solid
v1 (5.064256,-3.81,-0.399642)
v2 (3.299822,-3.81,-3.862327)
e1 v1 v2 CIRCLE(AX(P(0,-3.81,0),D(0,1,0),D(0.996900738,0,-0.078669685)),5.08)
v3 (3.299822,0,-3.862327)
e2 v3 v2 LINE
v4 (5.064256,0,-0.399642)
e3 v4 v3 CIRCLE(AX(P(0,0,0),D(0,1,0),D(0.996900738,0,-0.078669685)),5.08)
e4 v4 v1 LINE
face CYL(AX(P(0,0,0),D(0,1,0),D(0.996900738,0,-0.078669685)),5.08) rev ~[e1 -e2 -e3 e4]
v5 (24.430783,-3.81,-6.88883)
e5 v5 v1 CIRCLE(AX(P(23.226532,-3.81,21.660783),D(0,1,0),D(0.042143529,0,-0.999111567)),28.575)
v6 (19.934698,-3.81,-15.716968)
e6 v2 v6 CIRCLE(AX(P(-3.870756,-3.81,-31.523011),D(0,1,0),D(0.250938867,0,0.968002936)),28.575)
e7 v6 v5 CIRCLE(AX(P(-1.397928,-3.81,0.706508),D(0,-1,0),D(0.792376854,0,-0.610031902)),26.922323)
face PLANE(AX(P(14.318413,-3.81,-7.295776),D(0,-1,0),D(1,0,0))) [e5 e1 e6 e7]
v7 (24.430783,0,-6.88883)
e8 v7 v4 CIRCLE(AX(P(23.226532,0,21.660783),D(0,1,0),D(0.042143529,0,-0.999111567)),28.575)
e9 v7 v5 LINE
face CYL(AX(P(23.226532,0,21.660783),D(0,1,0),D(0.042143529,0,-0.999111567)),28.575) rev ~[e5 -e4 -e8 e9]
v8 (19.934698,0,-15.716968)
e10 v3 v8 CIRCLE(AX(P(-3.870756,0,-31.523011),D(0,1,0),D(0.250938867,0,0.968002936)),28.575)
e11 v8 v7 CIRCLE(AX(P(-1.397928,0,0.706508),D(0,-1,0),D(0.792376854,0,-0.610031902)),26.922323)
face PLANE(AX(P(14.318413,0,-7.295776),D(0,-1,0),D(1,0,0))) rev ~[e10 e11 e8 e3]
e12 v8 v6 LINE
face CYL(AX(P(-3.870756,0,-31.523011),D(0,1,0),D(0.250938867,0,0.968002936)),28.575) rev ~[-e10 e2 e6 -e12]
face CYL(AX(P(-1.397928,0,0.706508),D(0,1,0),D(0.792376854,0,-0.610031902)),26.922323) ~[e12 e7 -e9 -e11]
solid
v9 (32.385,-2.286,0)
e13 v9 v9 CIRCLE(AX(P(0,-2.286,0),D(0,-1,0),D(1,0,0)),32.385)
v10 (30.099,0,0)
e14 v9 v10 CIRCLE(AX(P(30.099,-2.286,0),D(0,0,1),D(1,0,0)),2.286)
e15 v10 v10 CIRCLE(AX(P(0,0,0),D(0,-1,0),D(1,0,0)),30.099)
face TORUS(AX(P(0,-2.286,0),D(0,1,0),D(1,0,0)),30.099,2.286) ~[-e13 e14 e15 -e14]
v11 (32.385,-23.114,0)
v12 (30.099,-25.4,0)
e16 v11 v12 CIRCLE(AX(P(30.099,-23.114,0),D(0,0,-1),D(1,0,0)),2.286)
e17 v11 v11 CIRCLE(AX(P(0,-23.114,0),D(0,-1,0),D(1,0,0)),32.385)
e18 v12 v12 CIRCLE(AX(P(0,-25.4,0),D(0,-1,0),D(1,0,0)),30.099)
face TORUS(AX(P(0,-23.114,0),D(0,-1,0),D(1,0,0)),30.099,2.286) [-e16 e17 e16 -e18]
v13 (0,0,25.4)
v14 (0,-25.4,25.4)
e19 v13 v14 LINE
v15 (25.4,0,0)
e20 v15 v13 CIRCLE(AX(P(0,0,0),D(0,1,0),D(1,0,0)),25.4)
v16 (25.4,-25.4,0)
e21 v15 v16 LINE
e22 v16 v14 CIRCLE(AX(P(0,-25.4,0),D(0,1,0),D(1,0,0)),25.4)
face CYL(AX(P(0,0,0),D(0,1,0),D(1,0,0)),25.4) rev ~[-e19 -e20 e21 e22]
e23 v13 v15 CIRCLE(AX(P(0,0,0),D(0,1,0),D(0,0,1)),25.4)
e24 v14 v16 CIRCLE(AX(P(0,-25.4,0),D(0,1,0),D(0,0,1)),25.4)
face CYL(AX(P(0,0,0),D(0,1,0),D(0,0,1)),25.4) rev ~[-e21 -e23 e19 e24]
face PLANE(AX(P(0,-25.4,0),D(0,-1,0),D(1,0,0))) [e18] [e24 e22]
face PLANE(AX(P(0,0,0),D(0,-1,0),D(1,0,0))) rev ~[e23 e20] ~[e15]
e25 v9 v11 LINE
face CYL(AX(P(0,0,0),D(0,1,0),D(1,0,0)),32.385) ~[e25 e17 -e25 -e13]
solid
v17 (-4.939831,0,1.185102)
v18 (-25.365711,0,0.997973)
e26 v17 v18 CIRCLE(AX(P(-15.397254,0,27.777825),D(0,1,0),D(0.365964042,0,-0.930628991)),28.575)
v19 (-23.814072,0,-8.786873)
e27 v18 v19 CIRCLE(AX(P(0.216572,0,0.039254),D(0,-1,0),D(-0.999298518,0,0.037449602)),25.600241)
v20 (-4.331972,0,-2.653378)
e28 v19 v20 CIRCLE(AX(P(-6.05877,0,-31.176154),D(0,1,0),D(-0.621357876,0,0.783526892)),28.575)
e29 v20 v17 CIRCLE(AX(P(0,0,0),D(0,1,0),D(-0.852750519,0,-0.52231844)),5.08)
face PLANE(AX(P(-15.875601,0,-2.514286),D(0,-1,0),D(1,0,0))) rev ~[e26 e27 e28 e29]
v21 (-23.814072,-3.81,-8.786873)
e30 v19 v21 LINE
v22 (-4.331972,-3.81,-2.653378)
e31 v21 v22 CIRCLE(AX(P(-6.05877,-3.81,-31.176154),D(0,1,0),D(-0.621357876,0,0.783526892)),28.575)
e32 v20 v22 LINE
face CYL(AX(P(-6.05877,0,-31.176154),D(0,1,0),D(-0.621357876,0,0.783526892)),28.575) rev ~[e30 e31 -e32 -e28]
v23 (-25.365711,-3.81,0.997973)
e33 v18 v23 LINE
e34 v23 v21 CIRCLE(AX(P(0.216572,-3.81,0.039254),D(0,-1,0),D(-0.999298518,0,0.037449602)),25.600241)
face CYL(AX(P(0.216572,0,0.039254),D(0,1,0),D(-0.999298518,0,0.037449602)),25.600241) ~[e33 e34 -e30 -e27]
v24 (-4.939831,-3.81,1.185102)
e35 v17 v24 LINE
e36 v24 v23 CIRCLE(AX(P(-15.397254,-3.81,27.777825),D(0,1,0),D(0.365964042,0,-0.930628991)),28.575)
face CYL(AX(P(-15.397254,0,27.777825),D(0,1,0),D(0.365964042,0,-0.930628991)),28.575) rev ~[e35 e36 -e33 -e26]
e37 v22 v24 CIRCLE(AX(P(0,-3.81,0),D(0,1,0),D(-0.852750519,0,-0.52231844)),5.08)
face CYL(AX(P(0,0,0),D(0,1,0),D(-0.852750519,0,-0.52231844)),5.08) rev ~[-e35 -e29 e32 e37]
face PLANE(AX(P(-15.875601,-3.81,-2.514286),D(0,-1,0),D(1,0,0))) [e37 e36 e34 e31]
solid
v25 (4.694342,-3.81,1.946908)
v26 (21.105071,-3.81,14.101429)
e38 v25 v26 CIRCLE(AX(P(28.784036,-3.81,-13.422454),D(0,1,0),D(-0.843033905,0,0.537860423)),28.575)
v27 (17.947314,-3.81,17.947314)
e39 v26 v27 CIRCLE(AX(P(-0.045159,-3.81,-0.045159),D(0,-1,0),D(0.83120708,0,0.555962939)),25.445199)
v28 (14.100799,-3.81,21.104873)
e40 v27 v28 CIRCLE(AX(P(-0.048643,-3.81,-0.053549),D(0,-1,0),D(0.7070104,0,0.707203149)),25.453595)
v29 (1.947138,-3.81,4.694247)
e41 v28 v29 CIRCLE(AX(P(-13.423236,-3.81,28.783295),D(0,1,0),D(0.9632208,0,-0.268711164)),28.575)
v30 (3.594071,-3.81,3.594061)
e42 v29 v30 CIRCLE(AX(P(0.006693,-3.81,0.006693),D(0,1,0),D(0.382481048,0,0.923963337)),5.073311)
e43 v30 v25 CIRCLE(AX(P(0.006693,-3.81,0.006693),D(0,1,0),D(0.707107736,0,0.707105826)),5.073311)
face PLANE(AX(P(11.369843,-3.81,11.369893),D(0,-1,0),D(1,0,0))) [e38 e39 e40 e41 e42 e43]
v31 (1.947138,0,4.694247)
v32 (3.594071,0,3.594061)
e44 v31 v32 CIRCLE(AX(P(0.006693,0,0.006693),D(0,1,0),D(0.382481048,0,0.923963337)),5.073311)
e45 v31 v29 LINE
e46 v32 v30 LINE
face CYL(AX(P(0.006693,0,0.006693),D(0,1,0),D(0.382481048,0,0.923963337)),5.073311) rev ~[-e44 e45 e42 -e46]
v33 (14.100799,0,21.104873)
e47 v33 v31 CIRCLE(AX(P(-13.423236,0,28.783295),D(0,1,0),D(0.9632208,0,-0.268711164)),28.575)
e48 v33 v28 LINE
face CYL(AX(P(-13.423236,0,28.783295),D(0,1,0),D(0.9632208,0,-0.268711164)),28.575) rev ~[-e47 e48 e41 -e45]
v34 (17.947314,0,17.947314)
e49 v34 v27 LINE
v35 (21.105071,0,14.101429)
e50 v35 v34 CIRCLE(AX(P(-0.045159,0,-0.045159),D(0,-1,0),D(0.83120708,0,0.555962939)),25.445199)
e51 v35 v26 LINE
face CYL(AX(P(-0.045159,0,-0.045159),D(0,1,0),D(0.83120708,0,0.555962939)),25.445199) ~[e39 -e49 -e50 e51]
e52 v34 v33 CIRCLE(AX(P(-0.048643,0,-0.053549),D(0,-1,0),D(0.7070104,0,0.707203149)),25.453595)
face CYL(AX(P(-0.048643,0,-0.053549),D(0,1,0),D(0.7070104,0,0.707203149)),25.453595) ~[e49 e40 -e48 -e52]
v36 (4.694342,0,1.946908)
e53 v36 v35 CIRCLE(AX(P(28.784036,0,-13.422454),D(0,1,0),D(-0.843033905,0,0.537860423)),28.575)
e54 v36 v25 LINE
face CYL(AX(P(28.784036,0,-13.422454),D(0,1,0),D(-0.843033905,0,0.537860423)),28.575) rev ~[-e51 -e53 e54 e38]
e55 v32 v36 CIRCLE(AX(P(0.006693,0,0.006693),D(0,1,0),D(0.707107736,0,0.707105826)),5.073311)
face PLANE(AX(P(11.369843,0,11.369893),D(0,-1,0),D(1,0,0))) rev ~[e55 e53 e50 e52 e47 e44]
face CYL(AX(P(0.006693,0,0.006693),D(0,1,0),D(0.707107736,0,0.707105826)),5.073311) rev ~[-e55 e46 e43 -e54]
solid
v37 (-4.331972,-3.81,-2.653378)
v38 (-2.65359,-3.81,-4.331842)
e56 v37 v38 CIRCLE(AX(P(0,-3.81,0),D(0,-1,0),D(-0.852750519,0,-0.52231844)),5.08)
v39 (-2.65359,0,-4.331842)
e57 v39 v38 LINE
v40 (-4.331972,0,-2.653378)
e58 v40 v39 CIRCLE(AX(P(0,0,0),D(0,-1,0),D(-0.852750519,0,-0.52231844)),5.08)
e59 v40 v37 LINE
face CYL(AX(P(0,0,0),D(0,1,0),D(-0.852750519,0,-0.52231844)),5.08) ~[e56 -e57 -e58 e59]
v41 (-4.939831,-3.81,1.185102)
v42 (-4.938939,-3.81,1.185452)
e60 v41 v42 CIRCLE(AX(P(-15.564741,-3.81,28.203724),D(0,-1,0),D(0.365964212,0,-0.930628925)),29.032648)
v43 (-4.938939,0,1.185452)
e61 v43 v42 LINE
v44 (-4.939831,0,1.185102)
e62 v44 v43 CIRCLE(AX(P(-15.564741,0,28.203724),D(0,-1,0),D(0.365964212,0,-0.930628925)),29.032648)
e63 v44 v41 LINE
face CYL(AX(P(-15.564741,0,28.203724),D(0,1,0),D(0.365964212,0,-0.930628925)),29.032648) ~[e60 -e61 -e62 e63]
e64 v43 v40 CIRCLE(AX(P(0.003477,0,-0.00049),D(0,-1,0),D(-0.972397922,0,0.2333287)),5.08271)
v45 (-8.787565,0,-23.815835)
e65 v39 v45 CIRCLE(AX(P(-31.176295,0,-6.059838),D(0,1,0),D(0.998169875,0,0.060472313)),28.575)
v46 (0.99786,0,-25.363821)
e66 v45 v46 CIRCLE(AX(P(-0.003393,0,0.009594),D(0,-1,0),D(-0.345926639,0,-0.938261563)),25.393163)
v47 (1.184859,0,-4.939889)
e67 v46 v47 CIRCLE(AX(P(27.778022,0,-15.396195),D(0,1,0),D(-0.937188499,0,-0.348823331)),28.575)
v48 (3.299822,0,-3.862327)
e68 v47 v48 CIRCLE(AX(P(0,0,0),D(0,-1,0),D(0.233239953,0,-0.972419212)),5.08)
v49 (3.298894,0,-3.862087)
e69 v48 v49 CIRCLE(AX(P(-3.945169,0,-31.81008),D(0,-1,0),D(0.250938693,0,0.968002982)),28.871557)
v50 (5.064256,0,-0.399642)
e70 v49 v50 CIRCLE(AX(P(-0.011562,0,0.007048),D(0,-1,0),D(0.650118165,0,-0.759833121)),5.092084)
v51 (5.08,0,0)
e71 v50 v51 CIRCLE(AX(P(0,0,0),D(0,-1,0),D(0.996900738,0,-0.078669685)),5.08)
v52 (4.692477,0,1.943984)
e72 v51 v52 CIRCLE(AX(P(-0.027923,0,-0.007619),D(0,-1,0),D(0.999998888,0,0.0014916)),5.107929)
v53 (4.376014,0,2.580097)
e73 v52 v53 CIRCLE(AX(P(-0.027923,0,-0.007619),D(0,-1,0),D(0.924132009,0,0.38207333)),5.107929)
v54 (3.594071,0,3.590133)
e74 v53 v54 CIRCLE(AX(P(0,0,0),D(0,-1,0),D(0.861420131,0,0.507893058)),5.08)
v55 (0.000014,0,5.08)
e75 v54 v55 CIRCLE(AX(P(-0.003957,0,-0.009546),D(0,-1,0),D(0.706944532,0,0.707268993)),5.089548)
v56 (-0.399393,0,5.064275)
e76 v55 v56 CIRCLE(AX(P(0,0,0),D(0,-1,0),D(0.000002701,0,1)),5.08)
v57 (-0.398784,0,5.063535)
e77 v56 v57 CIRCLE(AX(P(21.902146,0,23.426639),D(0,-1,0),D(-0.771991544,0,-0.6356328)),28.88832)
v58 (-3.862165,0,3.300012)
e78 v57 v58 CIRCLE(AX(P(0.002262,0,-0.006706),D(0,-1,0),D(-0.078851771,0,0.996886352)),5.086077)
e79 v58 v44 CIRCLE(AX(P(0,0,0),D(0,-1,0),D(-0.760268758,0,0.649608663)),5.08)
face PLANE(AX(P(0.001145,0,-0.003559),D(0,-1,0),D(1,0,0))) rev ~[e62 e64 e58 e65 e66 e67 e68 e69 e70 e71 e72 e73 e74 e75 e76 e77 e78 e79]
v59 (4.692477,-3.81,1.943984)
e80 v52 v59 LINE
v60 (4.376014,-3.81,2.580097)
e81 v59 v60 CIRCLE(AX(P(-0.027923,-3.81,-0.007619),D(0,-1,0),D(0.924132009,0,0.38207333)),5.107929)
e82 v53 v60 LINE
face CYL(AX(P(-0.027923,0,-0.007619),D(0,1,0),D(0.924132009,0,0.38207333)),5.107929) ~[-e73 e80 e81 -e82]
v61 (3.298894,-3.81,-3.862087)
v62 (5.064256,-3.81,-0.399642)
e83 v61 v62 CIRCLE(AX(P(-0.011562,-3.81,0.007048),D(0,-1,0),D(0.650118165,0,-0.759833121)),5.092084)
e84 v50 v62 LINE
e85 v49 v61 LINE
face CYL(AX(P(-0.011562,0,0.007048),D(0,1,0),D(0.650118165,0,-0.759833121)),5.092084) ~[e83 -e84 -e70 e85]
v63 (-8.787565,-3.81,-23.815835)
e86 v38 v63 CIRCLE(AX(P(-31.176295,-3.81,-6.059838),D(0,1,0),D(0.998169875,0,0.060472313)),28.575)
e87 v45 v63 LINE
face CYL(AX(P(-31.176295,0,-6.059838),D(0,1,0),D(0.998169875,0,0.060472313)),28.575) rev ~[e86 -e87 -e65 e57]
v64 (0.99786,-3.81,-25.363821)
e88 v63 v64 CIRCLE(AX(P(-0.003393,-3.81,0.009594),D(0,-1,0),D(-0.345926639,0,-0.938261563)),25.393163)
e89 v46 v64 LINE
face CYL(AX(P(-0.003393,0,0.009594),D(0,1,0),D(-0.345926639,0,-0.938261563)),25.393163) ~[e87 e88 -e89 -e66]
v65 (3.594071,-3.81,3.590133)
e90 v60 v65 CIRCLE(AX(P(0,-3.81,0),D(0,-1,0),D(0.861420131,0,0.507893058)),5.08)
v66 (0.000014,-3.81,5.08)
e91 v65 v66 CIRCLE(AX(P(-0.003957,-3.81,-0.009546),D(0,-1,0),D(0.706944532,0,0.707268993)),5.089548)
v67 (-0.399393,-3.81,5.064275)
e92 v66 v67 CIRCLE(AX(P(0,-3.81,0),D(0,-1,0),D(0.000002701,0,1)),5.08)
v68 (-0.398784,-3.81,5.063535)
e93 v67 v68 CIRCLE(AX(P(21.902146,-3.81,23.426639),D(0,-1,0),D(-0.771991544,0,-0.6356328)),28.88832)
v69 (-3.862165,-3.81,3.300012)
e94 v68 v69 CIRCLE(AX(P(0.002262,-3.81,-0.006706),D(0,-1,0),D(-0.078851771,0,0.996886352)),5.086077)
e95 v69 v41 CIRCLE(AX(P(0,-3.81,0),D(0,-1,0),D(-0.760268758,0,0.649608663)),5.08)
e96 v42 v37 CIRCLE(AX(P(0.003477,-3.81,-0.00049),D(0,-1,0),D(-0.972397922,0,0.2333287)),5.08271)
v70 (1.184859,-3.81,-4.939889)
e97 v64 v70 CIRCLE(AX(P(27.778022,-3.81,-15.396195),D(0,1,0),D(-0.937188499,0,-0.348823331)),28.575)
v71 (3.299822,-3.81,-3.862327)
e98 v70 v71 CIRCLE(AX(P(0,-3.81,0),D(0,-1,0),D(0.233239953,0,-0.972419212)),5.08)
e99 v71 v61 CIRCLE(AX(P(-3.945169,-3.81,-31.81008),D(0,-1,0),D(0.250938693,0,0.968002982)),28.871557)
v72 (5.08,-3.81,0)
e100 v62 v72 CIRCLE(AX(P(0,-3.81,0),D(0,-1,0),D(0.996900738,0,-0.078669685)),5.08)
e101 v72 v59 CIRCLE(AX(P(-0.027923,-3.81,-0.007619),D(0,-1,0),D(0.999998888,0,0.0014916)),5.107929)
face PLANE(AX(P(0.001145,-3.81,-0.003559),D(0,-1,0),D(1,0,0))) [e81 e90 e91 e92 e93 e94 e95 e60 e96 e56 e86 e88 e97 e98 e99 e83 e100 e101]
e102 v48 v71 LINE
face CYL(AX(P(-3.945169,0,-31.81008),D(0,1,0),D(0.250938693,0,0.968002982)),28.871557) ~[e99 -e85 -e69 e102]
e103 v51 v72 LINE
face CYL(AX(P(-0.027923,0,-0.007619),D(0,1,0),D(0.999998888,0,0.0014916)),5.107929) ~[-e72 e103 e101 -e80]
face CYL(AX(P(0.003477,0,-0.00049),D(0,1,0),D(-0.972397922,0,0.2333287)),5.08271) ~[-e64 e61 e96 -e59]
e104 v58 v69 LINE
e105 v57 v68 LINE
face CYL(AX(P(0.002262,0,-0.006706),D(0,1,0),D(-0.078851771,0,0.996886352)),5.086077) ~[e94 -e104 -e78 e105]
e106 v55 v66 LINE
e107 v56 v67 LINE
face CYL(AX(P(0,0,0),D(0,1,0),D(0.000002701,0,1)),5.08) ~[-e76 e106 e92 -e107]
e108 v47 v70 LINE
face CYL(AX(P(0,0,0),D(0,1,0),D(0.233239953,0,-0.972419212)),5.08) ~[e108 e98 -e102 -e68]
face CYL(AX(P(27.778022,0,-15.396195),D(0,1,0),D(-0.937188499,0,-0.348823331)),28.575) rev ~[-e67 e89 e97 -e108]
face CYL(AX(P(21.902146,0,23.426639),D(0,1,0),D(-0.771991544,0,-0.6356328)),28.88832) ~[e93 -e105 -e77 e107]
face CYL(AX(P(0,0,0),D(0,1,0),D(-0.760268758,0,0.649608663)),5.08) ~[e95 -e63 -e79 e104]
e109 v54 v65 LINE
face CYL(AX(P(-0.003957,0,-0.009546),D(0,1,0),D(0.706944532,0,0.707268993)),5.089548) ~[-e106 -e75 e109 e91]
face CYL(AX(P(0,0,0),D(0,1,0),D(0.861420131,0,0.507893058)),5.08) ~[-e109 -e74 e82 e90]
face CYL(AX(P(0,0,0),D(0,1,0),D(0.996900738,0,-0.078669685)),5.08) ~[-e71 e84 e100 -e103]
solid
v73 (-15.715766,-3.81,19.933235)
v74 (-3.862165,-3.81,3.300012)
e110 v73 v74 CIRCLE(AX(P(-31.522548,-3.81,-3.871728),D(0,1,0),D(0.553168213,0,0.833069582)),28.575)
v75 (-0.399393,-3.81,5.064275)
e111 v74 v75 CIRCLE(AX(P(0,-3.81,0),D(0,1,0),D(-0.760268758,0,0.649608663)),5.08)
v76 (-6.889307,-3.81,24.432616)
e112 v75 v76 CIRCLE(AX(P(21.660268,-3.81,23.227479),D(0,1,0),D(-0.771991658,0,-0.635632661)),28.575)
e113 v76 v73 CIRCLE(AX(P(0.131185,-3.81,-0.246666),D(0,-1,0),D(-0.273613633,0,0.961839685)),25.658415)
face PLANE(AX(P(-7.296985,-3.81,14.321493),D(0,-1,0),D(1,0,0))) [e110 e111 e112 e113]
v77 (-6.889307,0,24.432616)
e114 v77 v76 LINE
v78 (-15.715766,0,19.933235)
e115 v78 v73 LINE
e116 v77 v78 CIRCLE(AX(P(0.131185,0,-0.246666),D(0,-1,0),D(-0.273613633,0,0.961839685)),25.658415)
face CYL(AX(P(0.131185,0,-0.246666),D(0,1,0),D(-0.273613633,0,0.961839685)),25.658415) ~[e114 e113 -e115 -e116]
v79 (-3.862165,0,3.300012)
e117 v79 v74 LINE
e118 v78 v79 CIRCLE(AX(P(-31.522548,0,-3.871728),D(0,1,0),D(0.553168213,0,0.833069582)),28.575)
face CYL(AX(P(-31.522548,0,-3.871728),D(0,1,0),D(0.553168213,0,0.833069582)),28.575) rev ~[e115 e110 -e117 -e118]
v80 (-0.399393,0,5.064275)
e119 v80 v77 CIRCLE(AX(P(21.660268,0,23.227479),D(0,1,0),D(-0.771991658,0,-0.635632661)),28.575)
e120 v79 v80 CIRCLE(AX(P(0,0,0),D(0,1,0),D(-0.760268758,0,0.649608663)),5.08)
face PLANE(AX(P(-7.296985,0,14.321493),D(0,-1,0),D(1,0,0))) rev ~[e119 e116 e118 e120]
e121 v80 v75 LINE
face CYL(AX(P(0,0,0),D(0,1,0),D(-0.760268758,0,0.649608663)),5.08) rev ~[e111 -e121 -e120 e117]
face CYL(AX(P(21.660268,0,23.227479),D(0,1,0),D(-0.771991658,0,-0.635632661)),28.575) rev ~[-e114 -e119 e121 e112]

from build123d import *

# Parameters (mm, degrees)
F0_R     = 27.305
F1_DEPTH = 25.4
F2_DEPTH = 3.81
F3_DEPTH = 3.81
F0_R_2   = 32.385
F4_DEPTH = 25.4
F5_R     = 2.286


with BuildPart() as f1:
    # F0 (on Front) → F1 (new body)
    with BuildSketch(Plane.XZ):
        Circle(F0_R)
        with BuildLine():
            ThreePointArc((0, 25.4), (17.9605122421, 17.9605122421), (25.4, 0))
            ThreePointArc((25.4, 0), (-17.9605122421, -17.9605122421), (0, 25.4))
        make_face(mode=Mode.SUBTRACT)
    extrude(amount=F1_DEPTH)

    # F0 (on Front) → F4 (join)
    with BuildSketch(Plane.XZ):
        Circle(F0_R_2)
        Circle(F0_R, mode=Mode.SUBTRACT)
    extrude(amount=F4_DEPTH)

    # F5
    f5_edges = [f1.edges().sort_by_distance(p)[0] for p in [
        (-32.385, 0, 0),
        (-32.385, -25.4, 0),
    ]]
    fillet(f5_edges, radius=F5_R)


with BuildPart() as f2:
    # F0 (on Front) → F2 (new body)
    with BuildSketch(Plane.XZ):
        with BuildLine():
            ThreePointArc((4.6943420121, 1.9469076959), (11.7768309148, 9.5402464113), (21.1050706762, 14.1014288083))
            ThreePointArc((21.1050706762, 14.1014288083), (19.6204327638, 16.1017497715), (17.947313904, 17.947313904))
            ThreePointArc((17.947313904, 17.947313904), (16.1014099509, 19.6203250282), (14.1007988537, 21.1048730615))
            ThreePointArc((14.1007988537, 21.1048730615), (9.5399900472, 11.7767988623), (1.9471382686, 4.694246561))
            ThreePointArc((1.9471382686, 4.694246561), (2.8248144406, 4.2253038625), (3.5940705708, 3.5940608637))
            ThreePointArc((3.5940705708, 3.5940608637), (4.225376988, 2.8247049807), (4.6943420121, 1.9469076959))
        make_face()
        with BuildLine():
            ThreePointArc((24.4307833241, -6.8888302352), (14.14792832, -5.4336738514), (5.0642555877, -0.3996419851))
            ThreePointArc((5.0642555877, -0.3996419851), (4.5262563388, -2.3063828671), (3.2998221317, -3.862327313))
            ThreePointArc((3.2998221317, -3.862327313), (12.7127227114, -8.2524534489), (19.9346977885, -15.716968222))
            ThreePointArc((19.9346977885, -15.716968222), (22.5923186543, -11.5114934038), (24.4307833241, -6.8888302352))
        make_face()
        with BuildLine():
            ThreePointArc((-3.8621651693, 3.3000119059), (-2.3061604636, 4.526369659), (-0.3993931489, 5.0642752183))
            ThreePointArc((-0.3993931489, 5.0642752183), (-5.4341382858, 14.1487260117), (-6.8893071571, 24.4326157606))
            ThreePointArc((-6.8893071571, 24.4326157606), (-11.5217587117, 22.6129744405), (-15.7157660774, 19.9332348715))
            ThreePointArc((-15.7157660774, 19.9332348715), (-8.2520810905, 12.7118781046), (-3.8621651693, 3.3000119059))
        make_face()
        with BuildLine():
            ThreePointArc((-1.5809043391, -4.8277468704), (-0.2058216404, -5.0761626418), (1.1848589263, -4.939889442))
            ThreePointArc((1.1848589263, -4.939889442), (-0.2058081178, -5.0758291335), (-1.5809043391, -4.8277468704))
        make_face()
        with BuildLine():
            ThreePointArc((0.9978603482, -25.3638212927), (-0.7957806377, -15.1345769828), (1.1848589263, -4.939889442))
            ThreePointArc((1.1848589263, -4.939889442), (-0.2058216404, -5.0761626418), (-1.5809043391, -4.8277468704))
            ThreePointArc((-1.5809043391, -4.8277468704), (-2.1317168887, -4.6110933064), (-2.653590442, -4.3318421186))
            ThreePointArc((-2.653590442, -4.3318421186), (-3.9201022654, -14.6406661355), (-8.7875646495, -23.8158345128))
            ThreePointArc((-8.7875646495, -23.8158345128), (-3.9710774773, -25.0716777648), (0.9978603482, -25.3638212927))
        make_face()
        with BuildLine():
            ThreePointArc((-4.3319724994, -2.6533775907), (-5.0174761344, -0.794563789), (-4.9398312171, 1.1851016499))
            ThreePointArc((-4.9398312171, 1.1851016499), (-15.1354791508, -0.7959758408), (-25.3657114203, 0.9979730226))
            ThreePointArc((-25.3657114203, 0.9979730226), (-25.067740133, -3.9702254045), (-23.814071713, -8.7868734083))
            ThreePointArc((-23.814071713, -8.7868734083), (-14.6397478017, -3.9200091294), (-4.3319724994, -2.6533775907))
        make_face()
        with BuildLine():
            ThreePointArc((-2.653590442, -4.3318421186), (-2.1317168887, -4.6110933064), (-1.5809043391, -4.8277468704))
            ThreePointArc((-1.5809043391, -4.8277468704), (-2.1318038089, -4.6106814204), (-2.6536484216, -4.3308853596))
            ThreePointArc((-2.6536484216, -4.3308853596), (-2.6536194278, -4.3313637388), (-2.653590442, -4.3318421186))
        make_face()
    extrude(amount=F2_DEPTH)

    # F0 (on Front) → F3 (join)
    with BuildSketch(Plane.XZ):
        with BuildLine():
            ThreePointArc((5.0642555877, -0.3996419851), (5.0760622509, -0.1999759972), (5.07999984, 0))
            ThreePointArc((5.07999984, 0), (4.9814434579, 0.990970805), (4.6924772139, 1.9439844496))
            ThreePointArc((4.6924772139, 1.9439844496), (4.5453190283, 2.2675494992), (4.3760141266, 2.5800966528))
            ThreePointArc((4.3760141266, 2.5800966528), (4.0169149714, 3.1097897818), (3.5940705708, 3.5901330207))
            ThreePointArc((3.5940705708, 3.5901330207), (1.9450231546, 4.692046096), (1.37204e-05, 5.0799998399))
            ThreePointArc((1.37204e-05, 5.0799998399), (-0.1998444343, 5.0760674322), (-0.3993931489, 5.0642752183))
            ThreePointArc((-0.3993931489, 5.0642752183), (-0.3990885143, 5.0639052384), (-0.3987838736, 5.0635352636))
            ThreePointArc((-0.3987838736, 5.0635352636), (-2.3055656836, 4.5256348971), (-3.8621651693, 3.3000119059))
            ThreePointArc((-3.8621651693, 3.3000119059), (-4.5262563388, 2.3063828671), (-4.9398312171, 1.1851016499))
            ThreePointArc((-4.9398312171, 1.1851016499), (-4.9393852081, 1.1852770445), (-4.9389392019, 1.1854524465))
            ThreePointArc((-4.9389392019, 1.1854524465), (-5.0168667916, -0.7942683785), (-4.3319724994, -2.6533775907))
            ThreePointArc((-4.3319724994, -2.6533775907), (-3.5921905844, -3.5920140839), (-2.653590442, -4.3318421186))
            ThreePointArc((-2.653590442, -4.3318421186), (-2.6536194278, -4.3313637388), (-2.6536484216, -4.3308853596))
            ThreePointArc((-2.6536484216, -4.3308853596), (-2.1318038089, -4.6106814204), (-1.5809043391, -4.8277468704))
            ThreePointArc((-1.5809043391, -4.8277468704), (-0.2058081178, -5.0758291335), (1.1848589263, -4.939889442))
            ThreePointArc((1.1848589263, -4.939889442), (2.3061604635, -4.5263696591), (3.2998221317, -3.862327313))
            ThreePointArc((3.2998221317, -3.862327313), (3.2993582084, -3.8622070527), (3.2988942831, -3.8620868001))
            ThreePointArc((3.2988942831, -3.8620868001), (4.5249044889, -2.3059143186), (5.0642555877, -0.3996419851))
        make_face()
    extrude(amount=F3_DEPTH)


solid = Compound([f1.part, f2.part])
